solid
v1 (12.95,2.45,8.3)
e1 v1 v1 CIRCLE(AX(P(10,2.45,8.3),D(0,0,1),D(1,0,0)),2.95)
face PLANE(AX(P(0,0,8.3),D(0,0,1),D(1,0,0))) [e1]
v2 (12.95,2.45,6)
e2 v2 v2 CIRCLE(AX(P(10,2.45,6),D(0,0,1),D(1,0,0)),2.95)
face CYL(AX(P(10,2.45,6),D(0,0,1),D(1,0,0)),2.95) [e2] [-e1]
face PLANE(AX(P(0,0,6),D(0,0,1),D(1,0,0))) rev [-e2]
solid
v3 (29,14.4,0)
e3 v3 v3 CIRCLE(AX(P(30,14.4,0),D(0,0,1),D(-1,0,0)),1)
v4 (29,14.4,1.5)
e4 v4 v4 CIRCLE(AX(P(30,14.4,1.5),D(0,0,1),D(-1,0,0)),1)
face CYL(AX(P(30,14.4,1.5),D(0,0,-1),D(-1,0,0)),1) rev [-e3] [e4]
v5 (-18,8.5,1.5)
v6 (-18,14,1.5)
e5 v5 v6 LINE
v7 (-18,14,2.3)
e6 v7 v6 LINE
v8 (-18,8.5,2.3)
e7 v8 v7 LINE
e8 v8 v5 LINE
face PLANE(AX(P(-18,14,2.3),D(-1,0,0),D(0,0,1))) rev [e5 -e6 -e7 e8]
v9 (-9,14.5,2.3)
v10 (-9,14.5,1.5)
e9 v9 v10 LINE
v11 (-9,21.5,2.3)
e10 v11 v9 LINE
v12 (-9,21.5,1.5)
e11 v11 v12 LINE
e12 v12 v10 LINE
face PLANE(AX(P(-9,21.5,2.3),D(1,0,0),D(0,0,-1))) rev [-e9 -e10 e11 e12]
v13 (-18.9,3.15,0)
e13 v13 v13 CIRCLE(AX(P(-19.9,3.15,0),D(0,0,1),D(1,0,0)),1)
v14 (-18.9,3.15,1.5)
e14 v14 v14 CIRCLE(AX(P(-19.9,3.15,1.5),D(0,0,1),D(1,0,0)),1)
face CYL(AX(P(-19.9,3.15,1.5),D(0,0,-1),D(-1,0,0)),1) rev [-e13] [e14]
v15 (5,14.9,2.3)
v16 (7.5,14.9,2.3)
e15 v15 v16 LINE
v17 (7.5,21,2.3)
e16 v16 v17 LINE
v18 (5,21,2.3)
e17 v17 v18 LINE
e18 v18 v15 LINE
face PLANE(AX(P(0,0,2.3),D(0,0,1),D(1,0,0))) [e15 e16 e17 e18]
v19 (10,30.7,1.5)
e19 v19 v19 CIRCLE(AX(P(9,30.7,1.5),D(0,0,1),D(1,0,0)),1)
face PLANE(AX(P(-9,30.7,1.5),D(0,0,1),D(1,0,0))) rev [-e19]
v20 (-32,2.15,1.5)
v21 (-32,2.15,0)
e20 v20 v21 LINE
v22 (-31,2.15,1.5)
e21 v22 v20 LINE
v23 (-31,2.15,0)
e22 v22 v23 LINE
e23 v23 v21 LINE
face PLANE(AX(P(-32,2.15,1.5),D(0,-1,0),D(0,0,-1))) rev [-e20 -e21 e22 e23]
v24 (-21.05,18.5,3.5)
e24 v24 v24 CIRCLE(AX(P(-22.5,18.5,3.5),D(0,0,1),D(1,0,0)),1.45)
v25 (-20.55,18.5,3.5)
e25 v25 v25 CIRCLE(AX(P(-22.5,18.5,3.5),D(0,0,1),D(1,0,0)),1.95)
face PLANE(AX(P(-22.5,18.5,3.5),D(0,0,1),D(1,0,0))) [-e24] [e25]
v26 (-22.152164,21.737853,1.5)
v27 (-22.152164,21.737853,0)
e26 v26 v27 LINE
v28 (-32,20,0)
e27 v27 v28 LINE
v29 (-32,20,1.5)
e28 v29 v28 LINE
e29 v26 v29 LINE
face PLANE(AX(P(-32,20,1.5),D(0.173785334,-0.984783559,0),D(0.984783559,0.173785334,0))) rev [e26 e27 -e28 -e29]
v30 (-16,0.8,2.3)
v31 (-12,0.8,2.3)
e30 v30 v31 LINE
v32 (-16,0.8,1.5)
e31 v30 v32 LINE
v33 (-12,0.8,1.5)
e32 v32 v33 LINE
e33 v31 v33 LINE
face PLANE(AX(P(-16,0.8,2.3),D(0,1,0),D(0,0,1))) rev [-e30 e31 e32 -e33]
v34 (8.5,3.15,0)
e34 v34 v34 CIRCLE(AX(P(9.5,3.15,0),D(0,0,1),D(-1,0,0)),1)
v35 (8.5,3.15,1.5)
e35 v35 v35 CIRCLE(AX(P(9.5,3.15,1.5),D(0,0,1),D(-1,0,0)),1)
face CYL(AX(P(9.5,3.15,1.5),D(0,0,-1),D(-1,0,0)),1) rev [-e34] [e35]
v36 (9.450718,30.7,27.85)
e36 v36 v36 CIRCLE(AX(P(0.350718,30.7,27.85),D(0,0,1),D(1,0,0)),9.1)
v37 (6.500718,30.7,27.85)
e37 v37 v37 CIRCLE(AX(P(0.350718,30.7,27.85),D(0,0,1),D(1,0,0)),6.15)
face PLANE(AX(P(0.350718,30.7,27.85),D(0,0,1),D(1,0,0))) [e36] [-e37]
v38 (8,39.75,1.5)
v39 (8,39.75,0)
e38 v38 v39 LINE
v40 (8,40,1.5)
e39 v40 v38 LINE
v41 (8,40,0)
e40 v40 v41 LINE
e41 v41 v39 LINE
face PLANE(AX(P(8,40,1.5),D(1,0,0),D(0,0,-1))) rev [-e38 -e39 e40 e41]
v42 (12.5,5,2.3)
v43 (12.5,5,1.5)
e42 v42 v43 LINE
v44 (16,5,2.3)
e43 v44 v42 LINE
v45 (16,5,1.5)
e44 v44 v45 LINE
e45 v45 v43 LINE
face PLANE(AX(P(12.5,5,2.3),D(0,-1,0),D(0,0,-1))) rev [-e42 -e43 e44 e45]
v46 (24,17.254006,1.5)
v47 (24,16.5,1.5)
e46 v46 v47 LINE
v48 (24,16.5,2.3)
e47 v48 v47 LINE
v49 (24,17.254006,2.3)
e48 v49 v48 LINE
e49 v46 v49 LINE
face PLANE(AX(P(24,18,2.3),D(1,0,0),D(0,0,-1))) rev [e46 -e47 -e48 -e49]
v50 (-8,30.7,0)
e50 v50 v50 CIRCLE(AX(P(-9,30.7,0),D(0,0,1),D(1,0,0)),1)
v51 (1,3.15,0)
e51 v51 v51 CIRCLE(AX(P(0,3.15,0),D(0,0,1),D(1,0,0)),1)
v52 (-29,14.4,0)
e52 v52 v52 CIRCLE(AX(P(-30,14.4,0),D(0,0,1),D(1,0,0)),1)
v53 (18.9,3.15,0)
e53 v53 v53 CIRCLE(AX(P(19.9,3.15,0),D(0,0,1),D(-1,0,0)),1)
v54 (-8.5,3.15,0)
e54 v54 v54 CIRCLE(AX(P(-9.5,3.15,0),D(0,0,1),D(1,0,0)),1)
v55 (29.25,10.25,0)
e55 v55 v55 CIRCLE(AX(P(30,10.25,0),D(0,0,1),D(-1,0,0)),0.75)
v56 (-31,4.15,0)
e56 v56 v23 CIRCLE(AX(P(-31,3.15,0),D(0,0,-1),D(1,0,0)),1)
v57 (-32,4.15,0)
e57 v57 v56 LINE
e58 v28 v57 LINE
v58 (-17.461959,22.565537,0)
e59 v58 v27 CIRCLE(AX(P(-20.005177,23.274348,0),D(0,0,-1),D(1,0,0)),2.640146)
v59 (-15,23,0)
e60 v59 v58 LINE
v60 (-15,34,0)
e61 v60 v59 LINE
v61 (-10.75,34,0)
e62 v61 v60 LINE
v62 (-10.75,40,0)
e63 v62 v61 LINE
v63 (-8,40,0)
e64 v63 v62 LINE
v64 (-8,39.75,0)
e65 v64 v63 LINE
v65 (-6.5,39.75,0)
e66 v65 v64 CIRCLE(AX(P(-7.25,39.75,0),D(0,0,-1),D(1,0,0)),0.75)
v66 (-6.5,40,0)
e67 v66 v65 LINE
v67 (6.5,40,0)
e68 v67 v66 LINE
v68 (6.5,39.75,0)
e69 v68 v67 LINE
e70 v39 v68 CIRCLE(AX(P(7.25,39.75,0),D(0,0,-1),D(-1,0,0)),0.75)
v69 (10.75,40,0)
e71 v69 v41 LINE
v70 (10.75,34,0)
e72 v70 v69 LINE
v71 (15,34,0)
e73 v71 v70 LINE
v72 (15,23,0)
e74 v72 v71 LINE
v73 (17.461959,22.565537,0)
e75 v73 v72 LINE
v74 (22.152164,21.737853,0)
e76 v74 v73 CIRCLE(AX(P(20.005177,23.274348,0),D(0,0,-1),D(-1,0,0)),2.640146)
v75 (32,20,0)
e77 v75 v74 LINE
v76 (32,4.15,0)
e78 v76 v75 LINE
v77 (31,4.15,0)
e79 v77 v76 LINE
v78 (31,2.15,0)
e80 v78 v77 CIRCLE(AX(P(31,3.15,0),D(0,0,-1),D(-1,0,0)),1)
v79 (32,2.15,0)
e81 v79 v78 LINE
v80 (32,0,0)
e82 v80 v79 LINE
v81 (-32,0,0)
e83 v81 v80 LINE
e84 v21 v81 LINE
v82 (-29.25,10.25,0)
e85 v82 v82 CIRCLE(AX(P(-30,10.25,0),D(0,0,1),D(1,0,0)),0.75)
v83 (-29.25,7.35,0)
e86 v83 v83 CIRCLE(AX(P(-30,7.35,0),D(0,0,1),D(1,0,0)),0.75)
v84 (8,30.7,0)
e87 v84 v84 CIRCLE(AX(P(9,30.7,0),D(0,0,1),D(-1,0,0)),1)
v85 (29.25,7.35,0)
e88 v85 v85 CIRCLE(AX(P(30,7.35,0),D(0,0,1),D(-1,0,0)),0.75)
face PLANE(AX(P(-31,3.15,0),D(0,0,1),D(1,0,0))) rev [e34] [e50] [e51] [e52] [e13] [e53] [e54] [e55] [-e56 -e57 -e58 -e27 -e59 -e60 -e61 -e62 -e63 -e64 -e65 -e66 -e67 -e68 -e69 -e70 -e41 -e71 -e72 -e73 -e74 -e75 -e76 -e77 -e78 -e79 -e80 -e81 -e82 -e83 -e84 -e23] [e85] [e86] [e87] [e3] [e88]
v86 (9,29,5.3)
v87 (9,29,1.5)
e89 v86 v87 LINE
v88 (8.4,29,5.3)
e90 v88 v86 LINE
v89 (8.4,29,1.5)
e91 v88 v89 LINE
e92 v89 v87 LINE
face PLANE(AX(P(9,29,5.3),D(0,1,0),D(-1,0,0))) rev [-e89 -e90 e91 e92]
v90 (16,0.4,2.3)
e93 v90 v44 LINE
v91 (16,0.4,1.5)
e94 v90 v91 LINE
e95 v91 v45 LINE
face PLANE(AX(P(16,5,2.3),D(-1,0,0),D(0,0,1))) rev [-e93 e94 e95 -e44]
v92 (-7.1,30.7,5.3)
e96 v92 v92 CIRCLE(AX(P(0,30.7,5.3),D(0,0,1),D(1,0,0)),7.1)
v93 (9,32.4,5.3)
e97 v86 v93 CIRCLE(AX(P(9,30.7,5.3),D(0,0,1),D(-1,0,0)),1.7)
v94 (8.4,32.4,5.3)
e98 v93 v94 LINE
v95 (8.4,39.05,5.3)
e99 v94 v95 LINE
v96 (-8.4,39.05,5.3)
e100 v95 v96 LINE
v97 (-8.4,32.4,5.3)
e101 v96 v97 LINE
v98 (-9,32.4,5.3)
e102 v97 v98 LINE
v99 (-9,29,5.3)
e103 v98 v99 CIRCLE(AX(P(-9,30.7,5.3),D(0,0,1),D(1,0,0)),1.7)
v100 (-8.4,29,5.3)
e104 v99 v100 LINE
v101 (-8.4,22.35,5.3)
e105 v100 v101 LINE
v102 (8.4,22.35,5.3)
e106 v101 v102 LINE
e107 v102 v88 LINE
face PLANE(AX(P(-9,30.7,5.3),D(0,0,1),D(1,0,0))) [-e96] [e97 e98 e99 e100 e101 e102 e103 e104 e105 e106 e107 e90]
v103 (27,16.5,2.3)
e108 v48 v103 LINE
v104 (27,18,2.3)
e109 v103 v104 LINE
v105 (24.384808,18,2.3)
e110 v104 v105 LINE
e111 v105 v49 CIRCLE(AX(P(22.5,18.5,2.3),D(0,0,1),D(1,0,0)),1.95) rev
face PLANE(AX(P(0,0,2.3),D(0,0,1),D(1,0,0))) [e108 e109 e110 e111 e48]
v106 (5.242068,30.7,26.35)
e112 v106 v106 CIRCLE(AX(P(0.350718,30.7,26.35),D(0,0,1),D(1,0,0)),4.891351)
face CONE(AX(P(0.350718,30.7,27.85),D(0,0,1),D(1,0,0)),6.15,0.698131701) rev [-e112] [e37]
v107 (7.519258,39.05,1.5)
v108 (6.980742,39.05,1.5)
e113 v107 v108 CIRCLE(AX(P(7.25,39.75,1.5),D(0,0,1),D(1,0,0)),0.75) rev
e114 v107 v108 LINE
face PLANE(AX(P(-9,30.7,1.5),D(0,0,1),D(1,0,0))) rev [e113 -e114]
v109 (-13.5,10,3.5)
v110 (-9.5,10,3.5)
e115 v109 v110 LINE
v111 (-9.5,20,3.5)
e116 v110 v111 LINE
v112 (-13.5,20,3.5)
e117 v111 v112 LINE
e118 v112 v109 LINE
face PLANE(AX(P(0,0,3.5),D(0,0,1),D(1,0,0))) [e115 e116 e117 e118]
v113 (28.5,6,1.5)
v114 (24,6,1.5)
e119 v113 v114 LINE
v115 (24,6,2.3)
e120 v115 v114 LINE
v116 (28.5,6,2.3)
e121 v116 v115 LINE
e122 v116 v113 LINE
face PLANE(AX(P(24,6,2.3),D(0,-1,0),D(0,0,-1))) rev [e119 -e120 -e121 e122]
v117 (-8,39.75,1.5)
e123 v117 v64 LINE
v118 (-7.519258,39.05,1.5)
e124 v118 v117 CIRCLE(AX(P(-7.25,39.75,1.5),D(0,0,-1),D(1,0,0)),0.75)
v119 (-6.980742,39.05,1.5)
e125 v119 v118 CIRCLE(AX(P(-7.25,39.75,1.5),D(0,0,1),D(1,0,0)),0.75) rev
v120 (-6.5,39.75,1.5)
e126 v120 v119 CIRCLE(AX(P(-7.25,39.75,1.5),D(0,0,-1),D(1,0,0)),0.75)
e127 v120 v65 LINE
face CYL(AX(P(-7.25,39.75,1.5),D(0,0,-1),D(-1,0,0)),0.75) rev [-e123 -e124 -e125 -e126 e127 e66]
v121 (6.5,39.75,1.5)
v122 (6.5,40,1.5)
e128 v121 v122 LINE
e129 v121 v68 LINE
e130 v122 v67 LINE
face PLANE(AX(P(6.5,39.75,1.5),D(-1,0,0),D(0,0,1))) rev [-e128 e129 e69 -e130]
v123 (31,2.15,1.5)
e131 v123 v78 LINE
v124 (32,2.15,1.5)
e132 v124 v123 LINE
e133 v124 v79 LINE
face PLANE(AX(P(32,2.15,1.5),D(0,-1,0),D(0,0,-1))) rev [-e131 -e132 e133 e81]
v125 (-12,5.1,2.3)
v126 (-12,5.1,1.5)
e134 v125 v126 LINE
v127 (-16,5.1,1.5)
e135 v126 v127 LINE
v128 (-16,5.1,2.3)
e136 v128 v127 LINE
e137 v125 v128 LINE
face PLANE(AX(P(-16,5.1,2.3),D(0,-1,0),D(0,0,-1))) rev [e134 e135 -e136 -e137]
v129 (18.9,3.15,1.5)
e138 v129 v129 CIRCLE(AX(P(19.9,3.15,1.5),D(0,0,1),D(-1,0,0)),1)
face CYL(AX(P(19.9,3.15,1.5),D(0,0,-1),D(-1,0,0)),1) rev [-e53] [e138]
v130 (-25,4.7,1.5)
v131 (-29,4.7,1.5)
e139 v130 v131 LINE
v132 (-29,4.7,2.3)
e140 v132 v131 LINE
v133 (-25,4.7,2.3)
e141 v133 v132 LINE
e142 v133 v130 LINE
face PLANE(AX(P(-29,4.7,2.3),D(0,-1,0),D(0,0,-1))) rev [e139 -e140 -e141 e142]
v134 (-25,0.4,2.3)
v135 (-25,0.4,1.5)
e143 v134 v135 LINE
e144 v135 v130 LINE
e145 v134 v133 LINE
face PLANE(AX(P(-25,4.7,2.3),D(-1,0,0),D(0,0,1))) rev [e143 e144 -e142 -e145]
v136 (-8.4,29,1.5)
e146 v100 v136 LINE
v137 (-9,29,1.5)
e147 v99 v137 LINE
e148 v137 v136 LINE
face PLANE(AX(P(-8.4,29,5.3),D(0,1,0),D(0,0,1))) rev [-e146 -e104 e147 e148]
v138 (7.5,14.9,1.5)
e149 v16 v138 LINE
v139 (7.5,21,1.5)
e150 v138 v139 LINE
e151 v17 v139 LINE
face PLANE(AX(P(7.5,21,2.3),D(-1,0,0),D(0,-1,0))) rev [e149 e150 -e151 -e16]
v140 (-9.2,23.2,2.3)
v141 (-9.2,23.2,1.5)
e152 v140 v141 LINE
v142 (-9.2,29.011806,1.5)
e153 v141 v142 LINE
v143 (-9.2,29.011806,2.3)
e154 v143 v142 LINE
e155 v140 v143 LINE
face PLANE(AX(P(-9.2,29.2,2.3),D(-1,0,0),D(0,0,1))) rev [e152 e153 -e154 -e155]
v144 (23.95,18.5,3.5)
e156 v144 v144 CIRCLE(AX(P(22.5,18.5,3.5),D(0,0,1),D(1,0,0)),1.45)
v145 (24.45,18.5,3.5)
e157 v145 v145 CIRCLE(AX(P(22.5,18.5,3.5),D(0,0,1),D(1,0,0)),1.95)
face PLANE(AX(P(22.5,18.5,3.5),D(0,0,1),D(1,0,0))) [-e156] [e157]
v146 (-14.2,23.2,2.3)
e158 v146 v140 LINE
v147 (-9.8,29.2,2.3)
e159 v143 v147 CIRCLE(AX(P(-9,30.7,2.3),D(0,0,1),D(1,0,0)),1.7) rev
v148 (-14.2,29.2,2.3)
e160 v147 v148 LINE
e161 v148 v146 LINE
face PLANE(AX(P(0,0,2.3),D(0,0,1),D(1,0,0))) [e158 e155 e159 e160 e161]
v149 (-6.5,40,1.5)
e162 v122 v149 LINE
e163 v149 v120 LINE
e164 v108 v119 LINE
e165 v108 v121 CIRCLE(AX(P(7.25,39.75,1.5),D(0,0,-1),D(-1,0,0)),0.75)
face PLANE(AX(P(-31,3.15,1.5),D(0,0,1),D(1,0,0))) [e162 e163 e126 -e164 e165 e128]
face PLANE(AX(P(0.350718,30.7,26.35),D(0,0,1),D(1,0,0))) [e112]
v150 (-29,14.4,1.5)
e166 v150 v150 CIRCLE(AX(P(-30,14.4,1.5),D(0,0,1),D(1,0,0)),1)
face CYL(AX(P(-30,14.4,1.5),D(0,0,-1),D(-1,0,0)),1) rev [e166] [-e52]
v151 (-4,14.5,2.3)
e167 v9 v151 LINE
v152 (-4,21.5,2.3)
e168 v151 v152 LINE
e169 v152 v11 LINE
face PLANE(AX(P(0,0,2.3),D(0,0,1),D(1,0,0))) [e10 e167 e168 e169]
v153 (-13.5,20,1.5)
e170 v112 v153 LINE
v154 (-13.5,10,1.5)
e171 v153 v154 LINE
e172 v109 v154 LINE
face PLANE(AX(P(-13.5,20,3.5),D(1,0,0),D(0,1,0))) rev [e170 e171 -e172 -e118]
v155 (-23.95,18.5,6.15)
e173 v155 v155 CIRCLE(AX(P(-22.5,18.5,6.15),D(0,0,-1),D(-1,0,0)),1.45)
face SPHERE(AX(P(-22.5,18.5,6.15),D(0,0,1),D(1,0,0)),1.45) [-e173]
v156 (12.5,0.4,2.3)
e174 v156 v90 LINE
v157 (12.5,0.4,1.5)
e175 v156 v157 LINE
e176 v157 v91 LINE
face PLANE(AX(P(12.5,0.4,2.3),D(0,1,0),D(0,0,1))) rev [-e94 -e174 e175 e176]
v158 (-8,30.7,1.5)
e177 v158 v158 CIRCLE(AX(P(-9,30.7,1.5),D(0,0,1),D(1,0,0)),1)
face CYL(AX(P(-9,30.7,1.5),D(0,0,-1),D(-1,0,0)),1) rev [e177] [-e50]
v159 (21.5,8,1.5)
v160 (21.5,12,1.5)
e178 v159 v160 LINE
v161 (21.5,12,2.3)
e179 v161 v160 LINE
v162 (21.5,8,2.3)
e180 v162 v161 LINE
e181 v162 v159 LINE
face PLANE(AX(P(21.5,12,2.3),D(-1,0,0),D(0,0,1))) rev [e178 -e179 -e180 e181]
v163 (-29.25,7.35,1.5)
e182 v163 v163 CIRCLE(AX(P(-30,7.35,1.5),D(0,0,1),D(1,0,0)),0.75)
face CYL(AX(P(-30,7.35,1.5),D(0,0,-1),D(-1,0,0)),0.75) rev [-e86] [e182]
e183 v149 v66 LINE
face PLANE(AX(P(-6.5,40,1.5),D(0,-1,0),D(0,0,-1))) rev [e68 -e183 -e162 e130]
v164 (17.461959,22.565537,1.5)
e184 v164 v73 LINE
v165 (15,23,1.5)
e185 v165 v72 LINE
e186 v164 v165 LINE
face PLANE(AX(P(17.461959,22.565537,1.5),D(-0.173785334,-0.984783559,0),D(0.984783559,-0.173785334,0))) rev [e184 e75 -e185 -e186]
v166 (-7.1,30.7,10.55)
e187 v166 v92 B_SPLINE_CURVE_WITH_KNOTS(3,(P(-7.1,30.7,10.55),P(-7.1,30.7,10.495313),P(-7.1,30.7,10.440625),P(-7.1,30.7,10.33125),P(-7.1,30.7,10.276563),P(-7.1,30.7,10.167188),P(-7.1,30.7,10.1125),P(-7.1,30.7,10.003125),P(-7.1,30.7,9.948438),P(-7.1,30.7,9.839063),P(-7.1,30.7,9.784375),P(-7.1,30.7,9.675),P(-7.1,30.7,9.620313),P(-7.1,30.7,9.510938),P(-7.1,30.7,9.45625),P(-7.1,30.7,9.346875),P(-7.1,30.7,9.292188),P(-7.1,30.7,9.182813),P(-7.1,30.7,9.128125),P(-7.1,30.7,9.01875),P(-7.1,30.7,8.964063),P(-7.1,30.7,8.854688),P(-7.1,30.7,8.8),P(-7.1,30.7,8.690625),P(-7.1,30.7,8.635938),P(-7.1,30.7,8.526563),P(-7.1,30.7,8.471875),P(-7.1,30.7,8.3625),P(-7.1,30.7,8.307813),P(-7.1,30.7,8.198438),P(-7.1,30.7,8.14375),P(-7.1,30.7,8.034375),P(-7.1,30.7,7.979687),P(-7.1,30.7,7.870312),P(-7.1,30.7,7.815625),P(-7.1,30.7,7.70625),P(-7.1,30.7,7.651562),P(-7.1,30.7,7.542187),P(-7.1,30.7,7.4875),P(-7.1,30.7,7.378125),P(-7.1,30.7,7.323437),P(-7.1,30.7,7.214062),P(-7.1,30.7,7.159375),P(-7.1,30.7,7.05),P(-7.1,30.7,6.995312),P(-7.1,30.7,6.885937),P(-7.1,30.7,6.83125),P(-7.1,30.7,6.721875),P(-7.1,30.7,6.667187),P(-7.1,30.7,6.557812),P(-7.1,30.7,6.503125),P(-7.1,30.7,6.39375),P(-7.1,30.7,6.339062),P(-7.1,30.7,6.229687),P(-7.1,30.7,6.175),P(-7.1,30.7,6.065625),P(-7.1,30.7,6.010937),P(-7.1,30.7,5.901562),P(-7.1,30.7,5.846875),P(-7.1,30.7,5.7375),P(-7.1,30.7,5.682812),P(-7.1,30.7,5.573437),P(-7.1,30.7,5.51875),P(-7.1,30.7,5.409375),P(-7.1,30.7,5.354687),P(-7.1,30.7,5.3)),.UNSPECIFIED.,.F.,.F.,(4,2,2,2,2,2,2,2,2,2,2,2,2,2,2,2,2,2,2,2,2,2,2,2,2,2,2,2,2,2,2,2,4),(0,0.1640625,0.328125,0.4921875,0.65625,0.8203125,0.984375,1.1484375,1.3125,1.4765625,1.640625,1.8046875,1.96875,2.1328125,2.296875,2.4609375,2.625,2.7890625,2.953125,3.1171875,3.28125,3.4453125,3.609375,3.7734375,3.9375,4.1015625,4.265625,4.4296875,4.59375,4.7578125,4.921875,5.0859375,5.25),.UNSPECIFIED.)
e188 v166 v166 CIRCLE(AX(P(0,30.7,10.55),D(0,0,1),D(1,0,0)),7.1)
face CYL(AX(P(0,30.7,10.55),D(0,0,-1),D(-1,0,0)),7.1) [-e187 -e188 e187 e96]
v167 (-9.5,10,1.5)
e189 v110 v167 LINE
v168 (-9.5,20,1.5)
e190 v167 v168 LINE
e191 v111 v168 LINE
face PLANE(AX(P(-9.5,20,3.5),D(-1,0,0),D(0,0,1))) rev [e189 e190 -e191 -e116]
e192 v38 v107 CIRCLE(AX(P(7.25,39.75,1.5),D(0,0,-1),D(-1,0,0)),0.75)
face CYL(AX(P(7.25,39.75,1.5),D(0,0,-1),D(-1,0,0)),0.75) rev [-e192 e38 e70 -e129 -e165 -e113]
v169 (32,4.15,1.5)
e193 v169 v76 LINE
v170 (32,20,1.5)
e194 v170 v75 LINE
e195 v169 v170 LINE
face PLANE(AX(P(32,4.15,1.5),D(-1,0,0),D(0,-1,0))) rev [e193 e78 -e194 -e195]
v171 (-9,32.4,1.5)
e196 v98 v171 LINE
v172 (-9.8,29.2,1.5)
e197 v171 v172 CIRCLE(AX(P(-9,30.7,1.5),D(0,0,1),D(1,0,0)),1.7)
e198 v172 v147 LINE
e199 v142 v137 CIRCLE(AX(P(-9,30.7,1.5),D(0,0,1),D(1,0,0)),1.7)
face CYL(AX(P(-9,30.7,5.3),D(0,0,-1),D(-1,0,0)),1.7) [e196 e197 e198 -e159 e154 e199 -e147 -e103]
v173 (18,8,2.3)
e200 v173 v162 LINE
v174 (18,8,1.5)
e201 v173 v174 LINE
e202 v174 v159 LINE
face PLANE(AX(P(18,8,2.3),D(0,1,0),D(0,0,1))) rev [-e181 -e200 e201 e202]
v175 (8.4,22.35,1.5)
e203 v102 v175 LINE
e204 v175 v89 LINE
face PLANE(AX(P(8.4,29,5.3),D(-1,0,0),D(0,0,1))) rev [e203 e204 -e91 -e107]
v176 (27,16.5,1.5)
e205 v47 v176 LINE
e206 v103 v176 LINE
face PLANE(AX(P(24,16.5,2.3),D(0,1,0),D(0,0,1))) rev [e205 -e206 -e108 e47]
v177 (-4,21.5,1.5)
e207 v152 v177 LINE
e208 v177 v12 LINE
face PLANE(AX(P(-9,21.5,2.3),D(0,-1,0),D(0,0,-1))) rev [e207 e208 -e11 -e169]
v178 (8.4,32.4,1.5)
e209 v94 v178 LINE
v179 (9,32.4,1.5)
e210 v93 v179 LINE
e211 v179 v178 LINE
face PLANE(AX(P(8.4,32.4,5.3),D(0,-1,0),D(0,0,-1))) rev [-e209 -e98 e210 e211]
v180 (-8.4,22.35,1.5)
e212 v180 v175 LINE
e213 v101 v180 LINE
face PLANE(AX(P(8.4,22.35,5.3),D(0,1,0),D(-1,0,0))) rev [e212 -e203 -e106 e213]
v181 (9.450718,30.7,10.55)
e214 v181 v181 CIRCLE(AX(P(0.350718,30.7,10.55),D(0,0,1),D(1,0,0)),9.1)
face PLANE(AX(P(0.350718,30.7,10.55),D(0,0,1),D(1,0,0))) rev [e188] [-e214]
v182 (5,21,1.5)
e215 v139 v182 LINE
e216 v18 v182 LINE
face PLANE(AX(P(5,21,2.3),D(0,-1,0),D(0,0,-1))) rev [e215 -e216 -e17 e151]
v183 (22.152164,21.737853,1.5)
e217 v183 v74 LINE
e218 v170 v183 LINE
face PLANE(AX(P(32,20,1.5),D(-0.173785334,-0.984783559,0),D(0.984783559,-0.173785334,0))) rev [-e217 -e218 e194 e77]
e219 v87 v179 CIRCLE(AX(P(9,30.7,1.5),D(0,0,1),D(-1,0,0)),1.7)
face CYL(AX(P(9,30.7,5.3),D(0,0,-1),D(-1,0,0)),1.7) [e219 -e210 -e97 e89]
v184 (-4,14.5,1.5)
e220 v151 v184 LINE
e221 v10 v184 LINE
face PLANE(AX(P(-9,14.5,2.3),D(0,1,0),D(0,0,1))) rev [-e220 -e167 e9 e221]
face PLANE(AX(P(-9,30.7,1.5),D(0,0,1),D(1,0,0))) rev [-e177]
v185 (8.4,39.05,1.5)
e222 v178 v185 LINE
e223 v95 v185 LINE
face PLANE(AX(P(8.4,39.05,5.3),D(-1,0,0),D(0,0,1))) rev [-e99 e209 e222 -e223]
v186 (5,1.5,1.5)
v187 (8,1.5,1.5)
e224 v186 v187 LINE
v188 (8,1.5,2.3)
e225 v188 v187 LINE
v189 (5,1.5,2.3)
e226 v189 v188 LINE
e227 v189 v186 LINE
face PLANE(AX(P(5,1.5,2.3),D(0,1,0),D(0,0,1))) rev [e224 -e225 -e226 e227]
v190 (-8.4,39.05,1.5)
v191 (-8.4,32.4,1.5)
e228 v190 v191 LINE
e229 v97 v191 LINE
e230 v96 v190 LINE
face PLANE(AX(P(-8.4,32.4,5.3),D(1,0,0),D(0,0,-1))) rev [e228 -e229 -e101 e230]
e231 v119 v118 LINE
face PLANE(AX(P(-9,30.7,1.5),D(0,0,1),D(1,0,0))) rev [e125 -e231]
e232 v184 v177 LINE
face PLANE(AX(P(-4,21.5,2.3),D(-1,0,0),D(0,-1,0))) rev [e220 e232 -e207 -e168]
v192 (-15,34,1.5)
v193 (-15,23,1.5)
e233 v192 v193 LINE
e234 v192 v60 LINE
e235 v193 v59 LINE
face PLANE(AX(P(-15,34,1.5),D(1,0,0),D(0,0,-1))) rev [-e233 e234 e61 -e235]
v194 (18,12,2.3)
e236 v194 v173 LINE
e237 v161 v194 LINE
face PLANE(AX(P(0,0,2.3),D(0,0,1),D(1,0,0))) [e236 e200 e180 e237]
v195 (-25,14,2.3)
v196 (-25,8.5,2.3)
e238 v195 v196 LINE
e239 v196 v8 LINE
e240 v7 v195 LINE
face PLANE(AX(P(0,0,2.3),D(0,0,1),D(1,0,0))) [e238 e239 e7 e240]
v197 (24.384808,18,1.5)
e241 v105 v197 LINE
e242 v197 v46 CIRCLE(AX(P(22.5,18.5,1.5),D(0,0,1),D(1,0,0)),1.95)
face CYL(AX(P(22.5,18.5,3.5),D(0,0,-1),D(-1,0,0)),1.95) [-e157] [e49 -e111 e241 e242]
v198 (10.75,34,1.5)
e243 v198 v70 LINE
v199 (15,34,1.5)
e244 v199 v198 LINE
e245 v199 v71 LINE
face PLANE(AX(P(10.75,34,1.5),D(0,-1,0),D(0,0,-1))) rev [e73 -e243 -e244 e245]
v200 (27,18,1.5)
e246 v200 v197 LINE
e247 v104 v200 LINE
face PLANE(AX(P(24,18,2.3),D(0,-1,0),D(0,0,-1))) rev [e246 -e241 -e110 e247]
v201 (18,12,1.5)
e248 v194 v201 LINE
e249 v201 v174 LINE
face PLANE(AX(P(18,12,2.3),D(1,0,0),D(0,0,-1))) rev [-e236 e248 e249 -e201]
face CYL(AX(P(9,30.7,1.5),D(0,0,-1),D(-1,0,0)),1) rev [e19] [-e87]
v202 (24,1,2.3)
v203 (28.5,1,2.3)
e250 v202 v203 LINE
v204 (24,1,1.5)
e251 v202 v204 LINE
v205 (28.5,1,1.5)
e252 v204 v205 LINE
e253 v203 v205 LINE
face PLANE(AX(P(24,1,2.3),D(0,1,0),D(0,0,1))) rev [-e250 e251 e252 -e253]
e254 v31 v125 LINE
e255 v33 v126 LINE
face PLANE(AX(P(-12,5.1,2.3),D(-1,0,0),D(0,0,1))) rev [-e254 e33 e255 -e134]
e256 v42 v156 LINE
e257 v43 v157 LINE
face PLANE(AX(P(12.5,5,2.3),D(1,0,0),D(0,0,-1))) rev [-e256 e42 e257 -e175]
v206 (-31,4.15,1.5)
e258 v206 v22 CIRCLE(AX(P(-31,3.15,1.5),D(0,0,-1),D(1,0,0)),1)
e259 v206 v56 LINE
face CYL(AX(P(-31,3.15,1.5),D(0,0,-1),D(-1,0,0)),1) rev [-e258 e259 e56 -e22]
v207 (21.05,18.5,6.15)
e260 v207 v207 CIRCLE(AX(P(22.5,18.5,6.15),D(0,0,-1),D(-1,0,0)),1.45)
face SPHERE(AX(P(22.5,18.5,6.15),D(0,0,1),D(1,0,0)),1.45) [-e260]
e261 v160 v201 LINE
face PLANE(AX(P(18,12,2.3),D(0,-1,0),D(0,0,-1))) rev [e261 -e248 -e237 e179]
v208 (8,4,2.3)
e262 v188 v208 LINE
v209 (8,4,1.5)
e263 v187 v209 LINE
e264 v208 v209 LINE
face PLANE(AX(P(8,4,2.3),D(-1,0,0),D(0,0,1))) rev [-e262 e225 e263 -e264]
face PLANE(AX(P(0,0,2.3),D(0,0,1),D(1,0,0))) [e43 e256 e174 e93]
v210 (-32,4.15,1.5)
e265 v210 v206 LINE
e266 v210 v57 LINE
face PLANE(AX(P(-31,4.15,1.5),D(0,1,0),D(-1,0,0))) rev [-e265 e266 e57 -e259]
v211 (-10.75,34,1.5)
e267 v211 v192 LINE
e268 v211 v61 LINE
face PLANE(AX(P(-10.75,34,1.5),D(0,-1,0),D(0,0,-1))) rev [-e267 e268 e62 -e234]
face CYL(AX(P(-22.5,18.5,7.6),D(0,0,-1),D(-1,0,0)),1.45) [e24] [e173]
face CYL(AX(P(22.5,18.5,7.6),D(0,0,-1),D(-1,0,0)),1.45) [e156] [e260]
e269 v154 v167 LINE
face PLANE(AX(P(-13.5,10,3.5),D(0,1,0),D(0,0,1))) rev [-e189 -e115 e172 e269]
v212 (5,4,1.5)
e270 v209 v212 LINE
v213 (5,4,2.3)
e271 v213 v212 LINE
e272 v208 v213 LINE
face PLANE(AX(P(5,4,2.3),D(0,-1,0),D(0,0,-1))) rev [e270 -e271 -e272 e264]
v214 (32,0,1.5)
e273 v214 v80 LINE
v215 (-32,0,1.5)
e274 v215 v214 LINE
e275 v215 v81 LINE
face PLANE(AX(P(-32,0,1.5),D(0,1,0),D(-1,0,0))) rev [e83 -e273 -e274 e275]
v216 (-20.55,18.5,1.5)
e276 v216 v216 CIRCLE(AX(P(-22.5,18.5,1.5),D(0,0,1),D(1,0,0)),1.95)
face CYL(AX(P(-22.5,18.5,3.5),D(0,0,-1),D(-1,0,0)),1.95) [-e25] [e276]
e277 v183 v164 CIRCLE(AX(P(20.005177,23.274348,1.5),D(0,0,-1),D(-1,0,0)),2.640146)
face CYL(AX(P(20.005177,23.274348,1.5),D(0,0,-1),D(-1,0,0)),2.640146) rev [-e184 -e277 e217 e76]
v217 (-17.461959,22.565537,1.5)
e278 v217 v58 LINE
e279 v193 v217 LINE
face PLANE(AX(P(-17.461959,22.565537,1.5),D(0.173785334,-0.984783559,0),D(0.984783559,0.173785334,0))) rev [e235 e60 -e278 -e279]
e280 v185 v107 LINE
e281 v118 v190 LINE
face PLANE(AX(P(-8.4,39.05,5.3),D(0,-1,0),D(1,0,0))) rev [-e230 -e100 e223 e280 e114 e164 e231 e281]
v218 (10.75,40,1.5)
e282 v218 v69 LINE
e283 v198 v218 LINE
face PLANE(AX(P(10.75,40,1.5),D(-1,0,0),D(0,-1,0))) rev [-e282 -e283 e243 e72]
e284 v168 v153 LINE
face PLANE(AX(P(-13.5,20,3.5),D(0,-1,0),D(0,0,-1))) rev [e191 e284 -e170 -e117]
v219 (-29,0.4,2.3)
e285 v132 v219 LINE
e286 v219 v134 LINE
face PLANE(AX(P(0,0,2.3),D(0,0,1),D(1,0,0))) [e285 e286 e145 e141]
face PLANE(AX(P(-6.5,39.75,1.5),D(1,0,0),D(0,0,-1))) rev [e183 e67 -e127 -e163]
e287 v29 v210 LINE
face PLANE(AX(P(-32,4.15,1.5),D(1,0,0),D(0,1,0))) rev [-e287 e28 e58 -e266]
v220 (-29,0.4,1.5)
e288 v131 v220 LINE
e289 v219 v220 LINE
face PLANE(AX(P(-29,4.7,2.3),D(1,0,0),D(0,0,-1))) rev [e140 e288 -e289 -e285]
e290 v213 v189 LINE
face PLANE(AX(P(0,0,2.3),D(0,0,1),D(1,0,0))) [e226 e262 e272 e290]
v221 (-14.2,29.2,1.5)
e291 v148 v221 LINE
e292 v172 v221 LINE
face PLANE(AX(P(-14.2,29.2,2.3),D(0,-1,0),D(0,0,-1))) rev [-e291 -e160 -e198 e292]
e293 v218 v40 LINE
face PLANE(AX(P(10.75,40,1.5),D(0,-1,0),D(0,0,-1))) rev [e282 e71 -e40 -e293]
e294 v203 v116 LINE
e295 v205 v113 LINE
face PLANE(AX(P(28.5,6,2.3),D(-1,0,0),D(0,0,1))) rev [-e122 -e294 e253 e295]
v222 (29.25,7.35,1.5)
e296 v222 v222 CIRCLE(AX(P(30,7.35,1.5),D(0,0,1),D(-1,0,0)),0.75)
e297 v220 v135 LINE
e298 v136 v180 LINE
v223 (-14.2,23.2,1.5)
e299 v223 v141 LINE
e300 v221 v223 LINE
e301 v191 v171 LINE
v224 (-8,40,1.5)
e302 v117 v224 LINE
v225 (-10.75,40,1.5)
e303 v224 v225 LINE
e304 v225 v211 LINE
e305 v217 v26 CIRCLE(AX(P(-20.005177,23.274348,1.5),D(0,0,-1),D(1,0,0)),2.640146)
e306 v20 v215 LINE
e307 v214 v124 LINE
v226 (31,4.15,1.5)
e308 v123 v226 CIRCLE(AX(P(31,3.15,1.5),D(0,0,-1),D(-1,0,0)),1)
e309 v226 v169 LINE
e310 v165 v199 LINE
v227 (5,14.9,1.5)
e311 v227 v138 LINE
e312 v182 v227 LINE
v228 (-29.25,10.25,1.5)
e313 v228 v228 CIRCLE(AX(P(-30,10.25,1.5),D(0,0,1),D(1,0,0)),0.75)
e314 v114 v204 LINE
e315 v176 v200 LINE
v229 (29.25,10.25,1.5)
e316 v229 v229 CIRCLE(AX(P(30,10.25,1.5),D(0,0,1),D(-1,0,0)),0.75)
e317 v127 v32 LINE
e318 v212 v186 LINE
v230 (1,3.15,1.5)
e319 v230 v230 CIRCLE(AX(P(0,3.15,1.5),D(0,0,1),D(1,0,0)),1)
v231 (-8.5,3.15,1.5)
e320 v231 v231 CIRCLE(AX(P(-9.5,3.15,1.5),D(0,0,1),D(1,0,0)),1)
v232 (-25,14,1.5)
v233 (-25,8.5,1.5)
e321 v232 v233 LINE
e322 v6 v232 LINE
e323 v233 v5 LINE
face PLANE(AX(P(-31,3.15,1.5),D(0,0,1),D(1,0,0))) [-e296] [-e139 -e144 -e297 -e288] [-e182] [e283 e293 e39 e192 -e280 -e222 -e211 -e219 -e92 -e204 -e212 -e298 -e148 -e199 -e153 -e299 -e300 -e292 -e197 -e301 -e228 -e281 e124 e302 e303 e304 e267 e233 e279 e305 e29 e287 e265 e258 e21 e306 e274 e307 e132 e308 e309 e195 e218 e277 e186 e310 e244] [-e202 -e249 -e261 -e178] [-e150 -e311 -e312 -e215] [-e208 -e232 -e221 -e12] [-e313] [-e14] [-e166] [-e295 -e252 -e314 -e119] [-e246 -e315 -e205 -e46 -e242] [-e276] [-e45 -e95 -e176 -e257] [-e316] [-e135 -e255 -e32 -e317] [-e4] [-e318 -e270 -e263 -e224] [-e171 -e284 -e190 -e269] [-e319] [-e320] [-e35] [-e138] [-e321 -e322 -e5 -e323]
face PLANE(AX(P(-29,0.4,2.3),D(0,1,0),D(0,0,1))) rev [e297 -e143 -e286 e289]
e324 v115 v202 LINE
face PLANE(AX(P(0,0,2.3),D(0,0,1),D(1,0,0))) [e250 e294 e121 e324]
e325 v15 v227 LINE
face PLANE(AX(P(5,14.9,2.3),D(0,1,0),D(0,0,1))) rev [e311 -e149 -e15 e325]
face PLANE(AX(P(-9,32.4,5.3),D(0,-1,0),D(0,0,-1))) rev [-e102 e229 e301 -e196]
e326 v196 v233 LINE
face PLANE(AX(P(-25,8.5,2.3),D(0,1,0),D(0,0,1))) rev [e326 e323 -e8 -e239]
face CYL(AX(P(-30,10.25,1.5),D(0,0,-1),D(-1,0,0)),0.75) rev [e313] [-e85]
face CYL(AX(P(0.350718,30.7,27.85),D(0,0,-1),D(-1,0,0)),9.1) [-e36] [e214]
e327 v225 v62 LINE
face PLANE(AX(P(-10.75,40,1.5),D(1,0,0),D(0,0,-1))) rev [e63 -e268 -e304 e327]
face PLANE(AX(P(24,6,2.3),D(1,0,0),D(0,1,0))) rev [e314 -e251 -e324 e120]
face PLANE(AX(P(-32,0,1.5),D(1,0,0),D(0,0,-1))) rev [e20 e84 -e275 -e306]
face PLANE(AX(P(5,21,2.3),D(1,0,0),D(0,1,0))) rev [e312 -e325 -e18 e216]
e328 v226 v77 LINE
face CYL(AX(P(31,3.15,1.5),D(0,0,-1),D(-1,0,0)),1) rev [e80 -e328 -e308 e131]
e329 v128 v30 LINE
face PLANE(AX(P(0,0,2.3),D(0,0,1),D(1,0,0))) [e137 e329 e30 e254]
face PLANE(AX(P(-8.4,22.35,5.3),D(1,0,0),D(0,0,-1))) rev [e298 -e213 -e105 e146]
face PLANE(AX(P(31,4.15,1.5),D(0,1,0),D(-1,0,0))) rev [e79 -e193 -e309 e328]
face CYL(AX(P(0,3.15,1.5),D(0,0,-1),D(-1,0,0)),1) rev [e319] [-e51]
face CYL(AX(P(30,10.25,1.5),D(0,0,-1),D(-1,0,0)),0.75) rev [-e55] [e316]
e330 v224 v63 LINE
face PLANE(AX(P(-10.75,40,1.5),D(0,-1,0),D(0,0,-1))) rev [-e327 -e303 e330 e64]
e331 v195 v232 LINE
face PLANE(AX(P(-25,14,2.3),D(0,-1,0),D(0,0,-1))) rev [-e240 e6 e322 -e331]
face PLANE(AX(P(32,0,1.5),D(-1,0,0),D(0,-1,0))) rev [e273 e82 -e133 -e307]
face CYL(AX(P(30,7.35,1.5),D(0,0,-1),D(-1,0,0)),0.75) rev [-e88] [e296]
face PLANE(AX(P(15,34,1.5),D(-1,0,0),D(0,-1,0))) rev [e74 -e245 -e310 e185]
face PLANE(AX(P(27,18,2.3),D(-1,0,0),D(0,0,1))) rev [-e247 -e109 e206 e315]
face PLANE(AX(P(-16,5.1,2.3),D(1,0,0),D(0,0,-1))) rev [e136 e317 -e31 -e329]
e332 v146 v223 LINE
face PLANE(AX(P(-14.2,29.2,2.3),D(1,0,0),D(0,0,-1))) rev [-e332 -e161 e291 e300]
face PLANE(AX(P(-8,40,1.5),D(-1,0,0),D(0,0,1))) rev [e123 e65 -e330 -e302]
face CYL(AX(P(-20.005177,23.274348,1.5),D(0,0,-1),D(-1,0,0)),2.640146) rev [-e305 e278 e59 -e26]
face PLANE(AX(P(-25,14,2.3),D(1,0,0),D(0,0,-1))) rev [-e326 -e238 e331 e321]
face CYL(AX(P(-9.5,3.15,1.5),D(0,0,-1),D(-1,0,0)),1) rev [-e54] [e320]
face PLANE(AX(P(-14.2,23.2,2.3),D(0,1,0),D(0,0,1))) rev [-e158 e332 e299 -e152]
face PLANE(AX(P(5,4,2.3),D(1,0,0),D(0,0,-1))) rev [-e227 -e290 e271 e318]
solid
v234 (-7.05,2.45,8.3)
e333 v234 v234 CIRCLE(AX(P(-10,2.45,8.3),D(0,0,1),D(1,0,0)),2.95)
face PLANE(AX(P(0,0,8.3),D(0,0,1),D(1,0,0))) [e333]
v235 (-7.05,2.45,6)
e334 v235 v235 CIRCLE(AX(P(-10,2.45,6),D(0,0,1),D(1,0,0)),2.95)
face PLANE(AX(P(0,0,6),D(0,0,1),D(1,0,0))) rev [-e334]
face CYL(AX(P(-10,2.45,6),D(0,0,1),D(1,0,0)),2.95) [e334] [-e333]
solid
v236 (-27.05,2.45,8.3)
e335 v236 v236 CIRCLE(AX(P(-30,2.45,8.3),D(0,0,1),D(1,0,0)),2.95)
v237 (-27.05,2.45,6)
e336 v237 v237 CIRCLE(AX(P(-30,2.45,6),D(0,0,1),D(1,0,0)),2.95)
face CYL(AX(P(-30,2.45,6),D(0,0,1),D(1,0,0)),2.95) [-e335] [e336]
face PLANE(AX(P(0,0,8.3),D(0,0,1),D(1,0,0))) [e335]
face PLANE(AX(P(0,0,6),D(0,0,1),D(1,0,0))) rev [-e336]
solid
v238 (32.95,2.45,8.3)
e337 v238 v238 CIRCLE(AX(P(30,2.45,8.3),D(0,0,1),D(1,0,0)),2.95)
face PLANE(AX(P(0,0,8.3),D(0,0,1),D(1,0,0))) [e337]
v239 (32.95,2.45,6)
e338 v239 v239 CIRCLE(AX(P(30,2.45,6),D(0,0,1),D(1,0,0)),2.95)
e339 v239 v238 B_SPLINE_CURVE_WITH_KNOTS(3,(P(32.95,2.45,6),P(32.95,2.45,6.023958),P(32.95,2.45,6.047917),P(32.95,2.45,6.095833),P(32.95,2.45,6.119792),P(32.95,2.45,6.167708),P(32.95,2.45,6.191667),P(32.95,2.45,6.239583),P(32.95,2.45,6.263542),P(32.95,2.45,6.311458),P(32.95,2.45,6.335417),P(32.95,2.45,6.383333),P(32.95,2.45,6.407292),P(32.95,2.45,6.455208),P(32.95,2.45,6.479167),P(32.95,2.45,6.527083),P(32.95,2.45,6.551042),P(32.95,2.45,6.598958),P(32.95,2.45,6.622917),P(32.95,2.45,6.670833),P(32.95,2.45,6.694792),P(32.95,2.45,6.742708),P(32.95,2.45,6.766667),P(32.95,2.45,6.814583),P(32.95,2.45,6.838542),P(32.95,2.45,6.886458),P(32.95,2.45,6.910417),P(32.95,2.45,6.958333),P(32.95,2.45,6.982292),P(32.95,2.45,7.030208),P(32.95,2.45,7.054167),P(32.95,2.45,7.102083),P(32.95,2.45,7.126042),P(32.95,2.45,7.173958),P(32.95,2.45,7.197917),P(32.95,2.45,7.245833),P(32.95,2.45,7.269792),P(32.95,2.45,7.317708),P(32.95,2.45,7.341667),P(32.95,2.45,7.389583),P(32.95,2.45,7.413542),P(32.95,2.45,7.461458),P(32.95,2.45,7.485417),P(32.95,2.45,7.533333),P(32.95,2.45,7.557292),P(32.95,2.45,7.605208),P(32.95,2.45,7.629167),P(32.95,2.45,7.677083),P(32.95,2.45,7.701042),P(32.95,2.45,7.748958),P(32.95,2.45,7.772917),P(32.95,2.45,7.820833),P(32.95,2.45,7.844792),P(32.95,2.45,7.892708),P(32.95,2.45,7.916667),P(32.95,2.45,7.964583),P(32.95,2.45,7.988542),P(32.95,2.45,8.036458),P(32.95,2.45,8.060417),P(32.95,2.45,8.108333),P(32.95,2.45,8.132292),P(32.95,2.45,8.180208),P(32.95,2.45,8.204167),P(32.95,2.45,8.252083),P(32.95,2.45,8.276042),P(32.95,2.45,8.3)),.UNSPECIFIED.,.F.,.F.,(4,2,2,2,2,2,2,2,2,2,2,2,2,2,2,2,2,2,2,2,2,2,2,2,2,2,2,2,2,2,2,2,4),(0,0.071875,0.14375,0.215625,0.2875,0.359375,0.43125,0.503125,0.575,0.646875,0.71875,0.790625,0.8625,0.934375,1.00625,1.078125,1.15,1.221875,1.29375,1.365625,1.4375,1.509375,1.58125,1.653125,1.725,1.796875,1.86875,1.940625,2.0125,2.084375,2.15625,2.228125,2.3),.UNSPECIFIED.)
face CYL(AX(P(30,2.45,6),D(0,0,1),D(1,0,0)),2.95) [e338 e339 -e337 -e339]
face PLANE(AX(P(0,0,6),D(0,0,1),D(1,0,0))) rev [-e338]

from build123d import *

# Parameters (mm, degrees)
ESQUISSE1_R             = 1
ESQUISSE1_R_2           = 0.75
BOSS_EXTRU_1_DEPTH      = 1.5
ESQUISSE2_W             = 4
ESQUISSE2_H             = 4.3
ESQUISSE2_W_2           = 3
ESQUISSE2_H_2           = 2.5
ESQUISSE2_W_3           = 3.5
ESQUISSE2_H_3           = 4.6
ESQUISSE2_W_4           = 4.5
ESQUISSE2_H_4           = 5
ESQUISSE2_H_5           = 4
ESQUISSE2_W_5           = 2.5
ESQUISSE2_H_6           = 6.1
ESQUISSE2_W_6           = 5
ESQUISSE2_H_7           = 7
ESQUISSE2_W_7           = 7
ESQUISSE2_H_8           = 5.5
ESQUISSE2_H_9           = 6
ESQUISSE2_H_10          = 1.5
BOSS_EXTRU_2_DEPTH      = 0.8
ESQUISSE3_W             = 4
ESQUISSE3_H             = 10
BOSS_EXTRU_3_DEPTH      = 2
ESQUISSE4_R             = 1.95
BOSS_EXTRU_4_DEPTH      = 2
ESQUISSE5_R             = 1.45
BOSS_EXTRU_5_DEPTH      = 4.1
CONG_1_R                = 1.45
CONG_2_R                = 1.45
BOSS_EXTRU_6_START      = 6
BOSS_EXTRU_6_OUTLINE_R  = 2.95
BOSS_EXTRU_6_DEPTH      = 2.3
BOSS_EXTRU_7_DEPTH      = 3.8
ESQUISSE7_R             = 7.1
BOSS_EXTRU_8_DEPTH      = 5.25
ESQUISSE8_R             = 9.1
BOSS_EXTRU_9_DEPTH      = 17.3
ESQUISSE9_R             = 6.15
ENL_V_MAT_EXTRU_1_DEPTH = 1.5
ENL_V_MAT_EXTRU_1_DRAFT = -40


# Read off the part's stored shape, not the designer's step: Boss.-Extru.6
with BuildPart() as part:
    # Esquisse1 → Boss.-Extru.1 (new body)
    with BuildSketch(Plane.XY):
        with BuildLine():
            Line((32, 0), (32, 2.15))
            Line((32, 2.15), (31, 2.15))
            ThreePointArc((31, 2.15), (30, 3.15), (31, 4.15))
            Line((31, 4.15), (32, 4.15))
            Line((32, 4.15), (32, 20))
            Line((32, 20), (22.152164412, 21.737853339))
            ThreePointArc((22.152164412, 21.737853339), (19.546358249, 20.674375706), (17.461958897, 22.565536665))
            Line((17.461958897, 22.565536665), (15, 23))
            Line((15, 23), (15, 34))
            Line((15, 34), (10.75, 34))
            Line((10.75, 34), (10.75, 40))
            Line((10.75, 40), (8, 40))
            Line((8, 40), (8, 39.75))
            ThreePointArc((8, 39.75), (7.25, 39), (6.5, 39.75))
            Line((6.5, 39.75), (6.5, 40))
            Line((6.5, 40), (-6.5, 40))
            Line((-6.5, 40), (-6.5, 39.75))
            ThreePointArc((-6.5, 39.75), (-7.25, 39), (-8, 39.75))
            Line((-8, 39.75), (-8, 40))
            Line((-8, 40), (-10.75, 40))
            Line((-10.75, 40), (-10.75, 34))
            Line((-10.75, 34), (-15, 34))
            Line((-15, 34), (-15, 23))
            Line((-15, 23), (-17.461958897, 22.565536665))
            ThreePointArc((-17.461958897, 22.565536665), (-19.546358249, 20.674375706), (-22.152164412, 21.737853339))
            Line((-22.152164412, 21.737853339), (-32, 20))
            Line((-32, 20), (-32, 4.15))
            Line((-32, 4.15), (-31, 4.15))
            ThreePointArc((-31, 4.15), (-30, 3.15), (-31, 2.15))
            Line((-31, 2.15), (-32, 2.15))
            Line((-32, 2.15), (-32, 0))
            Line((-32, 0), (32, 0))
        make_face()
        with Locations((-19.9, 3.15)):
            Circle(ESQUISSE1_R, mode=Mode.SUBTRACT)
        with Locations((-9.5, 3.15)):
            Circle(ESQUISSE1_R, mode=Mode.SUBTRACT)
        with Locations((0, 3.15)):
            Circle(ESQUISSE1_R, mode=Mode.SUBTRACT)
        with Locations((-30, 14.4)):
            Circle(ESQUISSE1_R, mode=Mode.SUBTRACT)
        with Locations((-30, 10.25)):
            Circle(ESQUISSE1_R_2, mode=Mode.SUBTRACT)
        with Locations((-30, 7.35)):
            Circle(ESQUISSE1_R_2, mode=Mode.SUBTRACT)
        with Locations((-9, 30.7)):
            Circle(ESQUISSE1_R, mode=Mode.SUBTRACT)
        with Locations(Location((30, 7.35, 0), (0, 0, 180))):
            Circle(ESQUISSE1_R_2, mode=Mode.SUBTRACT)
        with Locations(Location((30, 10.25, 0), (0, 0, 180))):
            Circle(ESQUISSE1_R_2, mode=Mode.SUBTRACT)
        with Locations(Location((30, 14.4, 0), (0, 0, 180))):
            Circle(ESQUISSE1_R, mode=Mode.SUBTRACT)
        with Locations(Location((9.5, 3.15, 0), (0, 0, 180))):
            Circle(ESQUISSE1_R, mode=Mode.SUBTRACT)
        with Locations(Location((19.9, 3.15, 0), (0, 0, 180))):
            Circle(ESQUISSE1_R, mode=Mode.SUBTRACT)
        with Locations(Location((9, 30.7, 0), (0, 0, 180))):
            Circle(ESQUISSE1_R, mode=Mode.SUBTRACT)
    extrude(amount=BOSS_EXTRU_1_DEPTH)

    # Esquisse2 → Boss.-Extru.2 (add)
    with BuildSketch(Plane.XY.offset(1.5)):
        with Locations((-27, 2.55)):
            Rectangle(ESQUISSE2_W, ESQUISSE2_H)
        with Locations((-14, 2.95)):
            Rectangle(ESQUISSE2_W, ESQUISSE2_H)
        with Locations((6.5, 2.75)):
            Rectangle(ESQUISSE2_W_2, ESQUISSE2_H_2)
        with Locations((14.25, 2.7)):
            Rectangle(ESQUISSE2_W_3, ESQUISSE2_H_3)
        with Locations((26.25, 3.5)):
            Rectangle(ESQUISSE2_W_4, ESQUISSE2_H_4)
        with Locations((19.75, 10)):
            Rectangle(ESQUISSE2_W_3, ESQUISSE2_H_5)
        with Locations((6.25, 17.95)):
            Rectangle(ESQUISSE2_W_5, ESQUISSE2_H_6)
        with Locations((-6.5, 18)):
            Rectangle(ESQUISSE2_W_6, ESQUISSE2_H_7)
        with Locations((-21.5, 11.25)):
            Rectangle(ESQUISSE2_W_7, ESQUISSE2_H_8)
        with Locations((-11.7, 26.2)):
            Rectangle(ESQUISSE2_W_6, ESQUISSE2_H_9)
        with Locations((25.5, 17.25)):
            Rectangle(ESQUISSE2_W_2, ESQUISSE2_H_10)
    extrude(amount=BOSS_EXTRU_2_DEPTH)

    # Esquisse3 → Boss.-Extru.3 (add)
    with BuildSketch(Plane.XY.offset(1.5)):
        with Locations((-11.5, 15)):
            Rectangle(ESQUISSE3_W, ESQUISSE3_H)
    extrude(amount=BOSS_EXTRU_3_DEPTH)

    # Esquisse4 → Boss.-Extru.4 (add)
    with BuildSketch(Plane.XY.offset(1.5)):
        with Locations((-22.5, 18.5)):
            Circle(ESQUISSE4_R)
        with Locations(Location((22.5, 18.5, 0), (0, 0, 320.284862768))):
            Circle(ESQUISSE4_R)
    extrude(amount=BOSS_EXTRU_4_DEPTH)

    # Esquisse5 → Boss.-Extru.5 (add)
    with BuildSketch(Plane.XY.offset(3.5)):
        with Locations((-22.5, 18.5)):
            Circle(ESQUISSE5_R)
        with Locations((22.5, 18.5)):
            Circle(ESQUISSE5_R)
    extrude(amount=BOSS_EXTRU_5_DEPTH)

    # Congé1
    cong_1_edges = [part.edges().sort_by_distance(p)[0] for p in [
        (-23.95, 18.5, 7.6),
    ]]
    fillet(cong_1_edges, radius=CONG_1_R)

    # Congé2
    cong_2_edges = [part.edges().sort_by_distance(p)[0] for p in [
        (21.05, 18.5, 7.6),
    ]]
    fillet(cong_2_edges, radius=CONG_2_R)

    # Esquisse6 → Boss.-Extru.7 (add)
    with BuildSketch(Plane.XY.offset(1.5)):
        with BuildLine():
            Line((-8.999999963, 32.4), (-8.399999968, 32.4))
            Line((-8.399999968, 32.4), (-8.399999968, 39.05))
            Line((-8.399999968, 39.05), (8.400000032, 39.05))
            Line((8.400000032, 39.05), (8.400000032, 32.4))
            Line((8.400000032, 32.4), (9.000000027, 32.4))
            ThreePointArc((9.000000027, 32.4), (10.7, 30.699999987), (9, 29))
            Line((9, 29), (8.400000005, 29))
            Line((8.400000005, 29), (8.400000005, 22.35))
            Line((8.400000005, 22.35), (-8.399999995, 22.35))
            Line((-8.399999995, 22.35), (-8.399999995, 29))
            Line((-8.399999995, 29), (-8.999999989, 29))
            ThreePointArc((-8.999999989, 29), (-10.7, 30.700000013), (-8.999999963, 32.4))
        make_face()
    extrude(amount=BOSS_EXTRU_7_DEPTH)

    # Esquisse7 → Boss.-Extru.8 (add)
    with BuildSketch(Plane.XY.offset(5.3)):
        with Locations(Location((3.2e-08, 30.7, 0), (0, 0, 180))):
            Circle(ESQUISSE7_R)
    extrude(amount=BOSS_EXTRU_8_DEPTH)

    # Esquisse8 → Boss.-Extru.9 (add)
    with BuildSketch(Plane.XY.offset(10.55)):
        with Locations((0.350717787, 30.7)):
            Circle(ESQUISSE8_R)
    extrude(amount=BOSS_EXTRU_9_DEPTH)


with BuildPart() as body_2:
    # Boss.-Extru.6 outline → Boss.-Extru.6 (new body)
    with BuildSketch(Plane.XY.offset(BOSS_EXTRU_6_START)):
        with Locations((30, 2.45)):
            Circle(BOSS_EXTRU_6_OUTLINE_R)
        with Locations((10, 2.45)):
            Circle(BOSS_EXTRU_6_OUTLINE_R)
        with Locations((-10, 2.45)):
            Circle(BOSS_EXTRU_6_OUTLINE_R)
        with Locations((-30, 2.45)):
            Circle(BOSS_EXTRU_6_OUTLINE_R)
    extrude(amount=BOSS_EXTRU_6_DEPTH)


with BuildPart() as enl_v_mat_extru_1_tool:
    # Esquisse9 → Enlèv. mat.-Extru.1 (with draft: the straight prism first)
    with BuildSketch(Plane.XY.offset(27.85)):
        with Locations((0.350717787, 30.7)):
            Circle(ESQUISSE9_R)
    extrude(amount=-ENL_V_MAT_EXTRU_1_DEPTH)
    # Enlèv. mat.-Extru.1: the draft: its side faces are tilted about the plane it starts from
    enl_v_mat_extru_1_sides = [enl_v_mat_extru_1_tool.faces().sort_by_distance(p)[0] for p in [
        (-5.799282213, 30.7, 27.1),
    ]]
    draft(enl_v_mat_extru_1_sides, Plane.XY.offset(27.85), ENL_V_MAT_EXTRU_1_DRAFT)


with BuildPart() as part_1:
    add(part.part)

    # Enlèv. mat.-Extru.1: cut by enl_v_mat_extru_1_tool
    add(enl_v_mat_extru_1_tool.part, mode=Mode.SUBTRACT)


solid = Compound([body_2.part, part_1.part])
